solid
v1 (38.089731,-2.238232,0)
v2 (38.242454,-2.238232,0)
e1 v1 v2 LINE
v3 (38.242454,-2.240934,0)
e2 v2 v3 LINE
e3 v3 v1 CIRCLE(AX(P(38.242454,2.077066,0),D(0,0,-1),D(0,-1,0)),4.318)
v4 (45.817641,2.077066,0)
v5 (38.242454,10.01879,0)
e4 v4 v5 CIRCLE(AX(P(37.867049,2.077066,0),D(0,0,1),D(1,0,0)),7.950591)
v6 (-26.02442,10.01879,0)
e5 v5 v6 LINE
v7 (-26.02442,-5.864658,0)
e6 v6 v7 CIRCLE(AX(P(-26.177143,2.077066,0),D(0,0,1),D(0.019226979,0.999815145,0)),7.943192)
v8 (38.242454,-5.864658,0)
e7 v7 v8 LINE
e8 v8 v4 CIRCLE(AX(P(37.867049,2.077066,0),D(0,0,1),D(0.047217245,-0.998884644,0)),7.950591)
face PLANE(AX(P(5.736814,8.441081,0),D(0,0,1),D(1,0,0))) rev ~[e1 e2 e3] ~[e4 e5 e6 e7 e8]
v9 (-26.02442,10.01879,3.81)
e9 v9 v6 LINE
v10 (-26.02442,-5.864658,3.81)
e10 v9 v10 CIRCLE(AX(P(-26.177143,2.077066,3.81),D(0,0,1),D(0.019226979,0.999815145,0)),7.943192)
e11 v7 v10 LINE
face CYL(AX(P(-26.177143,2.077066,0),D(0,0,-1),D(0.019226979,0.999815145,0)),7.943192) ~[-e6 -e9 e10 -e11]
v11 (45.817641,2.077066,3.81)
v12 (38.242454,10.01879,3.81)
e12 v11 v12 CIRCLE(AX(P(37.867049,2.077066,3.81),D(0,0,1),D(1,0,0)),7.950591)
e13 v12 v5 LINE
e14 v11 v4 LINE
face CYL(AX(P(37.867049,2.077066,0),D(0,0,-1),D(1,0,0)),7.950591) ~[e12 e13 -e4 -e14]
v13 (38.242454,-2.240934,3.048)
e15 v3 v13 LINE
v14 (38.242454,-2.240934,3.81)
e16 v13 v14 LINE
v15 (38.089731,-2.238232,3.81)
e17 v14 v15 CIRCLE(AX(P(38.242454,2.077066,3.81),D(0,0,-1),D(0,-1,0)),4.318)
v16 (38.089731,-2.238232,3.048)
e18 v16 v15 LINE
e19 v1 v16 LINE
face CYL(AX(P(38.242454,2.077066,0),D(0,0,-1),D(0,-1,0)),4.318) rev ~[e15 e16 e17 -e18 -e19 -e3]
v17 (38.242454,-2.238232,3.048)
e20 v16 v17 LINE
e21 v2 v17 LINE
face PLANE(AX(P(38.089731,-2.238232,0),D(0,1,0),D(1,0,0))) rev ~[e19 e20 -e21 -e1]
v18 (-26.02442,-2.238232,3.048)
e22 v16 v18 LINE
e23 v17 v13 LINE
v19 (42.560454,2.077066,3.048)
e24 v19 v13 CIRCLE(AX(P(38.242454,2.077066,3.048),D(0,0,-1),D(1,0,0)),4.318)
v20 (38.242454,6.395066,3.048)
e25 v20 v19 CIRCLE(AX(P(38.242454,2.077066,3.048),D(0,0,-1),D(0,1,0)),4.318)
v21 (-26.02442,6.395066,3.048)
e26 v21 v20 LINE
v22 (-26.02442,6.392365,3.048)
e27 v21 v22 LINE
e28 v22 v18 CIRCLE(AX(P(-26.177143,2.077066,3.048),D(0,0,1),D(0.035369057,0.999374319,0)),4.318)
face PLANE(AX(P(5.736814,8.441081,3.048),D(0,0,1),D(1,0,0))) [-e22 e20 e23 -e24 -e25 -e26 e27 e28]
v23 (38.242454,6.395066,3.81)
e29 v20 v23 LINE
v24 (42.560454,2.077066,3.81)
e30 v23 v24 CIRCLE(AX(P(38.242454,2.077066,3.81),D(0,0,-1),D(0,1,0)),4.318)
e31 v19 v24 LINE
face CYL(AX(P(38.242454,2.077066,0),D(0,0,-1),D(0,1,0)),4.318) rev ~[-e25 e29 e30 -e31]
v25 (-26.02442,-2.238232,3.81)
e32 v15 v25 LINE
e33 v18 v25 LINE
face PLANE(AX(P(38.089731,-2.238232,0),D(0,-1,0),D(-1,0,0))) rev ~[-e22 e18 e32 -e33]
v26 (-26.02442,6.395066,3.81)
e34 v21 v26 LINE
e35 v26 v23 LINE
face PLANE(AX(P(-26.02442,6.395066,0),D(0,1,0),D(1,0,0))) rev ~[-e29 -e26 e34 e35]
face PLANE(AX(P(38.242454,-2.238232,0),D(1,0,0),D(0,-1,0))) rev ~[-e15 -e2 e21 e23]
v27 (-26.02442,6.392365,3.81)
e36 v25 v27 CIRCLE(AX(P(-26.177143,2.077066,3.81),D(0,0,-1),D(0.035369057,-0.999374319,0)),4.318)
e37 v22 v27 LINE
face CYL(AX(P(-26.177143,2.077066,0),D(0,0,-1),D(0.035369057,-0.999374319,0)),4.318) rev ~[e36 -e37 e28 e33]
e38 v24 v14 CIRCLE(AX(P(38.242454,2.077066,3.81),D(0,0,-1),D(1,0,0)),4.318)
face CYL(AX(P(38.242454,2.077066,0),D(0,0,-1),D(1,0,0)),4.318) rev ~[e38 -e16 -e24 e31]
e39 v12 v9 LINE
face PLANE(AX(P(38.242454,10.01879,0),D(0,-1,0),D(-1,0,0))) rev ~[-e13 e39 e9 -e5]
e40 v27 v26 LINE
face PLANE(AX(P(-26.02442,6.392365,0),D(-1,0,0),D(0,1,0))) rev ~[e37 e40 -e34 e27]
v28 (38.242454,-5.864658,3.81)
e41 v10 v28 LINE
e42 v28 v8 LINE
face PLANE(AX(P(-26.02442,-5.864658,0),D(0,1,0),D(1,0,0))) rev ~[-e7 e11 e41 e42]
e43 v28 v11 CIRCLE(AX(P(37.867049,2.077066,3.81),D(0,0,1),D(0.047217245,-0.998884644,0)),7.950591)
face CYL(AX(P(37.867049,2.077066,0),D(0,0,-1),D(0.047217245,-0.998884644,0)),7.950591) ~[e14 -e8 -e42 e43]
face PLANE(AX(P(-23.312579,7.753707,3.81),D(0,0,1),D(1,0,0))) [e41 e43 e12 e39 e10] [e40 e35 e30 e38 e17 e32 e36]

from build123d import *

# Parameters (mm, degrees)
F1_DEPTH = 3.81
F2_DEPTH = 3.048


with BuildPart() as f1:
    # F0 (on Top) → F1 (new body)
    with BuildSketch(Plane.XY):
        with BuildLine():
            ThreePointArc((-19.510121746, 6.3950662109), (-22.3157867582, 9.0185520845), (-26.0244197252, 10.0187899587))
            Line((-26.0244197252, 10.0187899587), (-26.0244197252, 6.3950662109))
            Line((-26.0244197252, 6.3950662109), (-19.510121746, 6.3950662109))
        make_face()
        with BuildLine():
            Line((-26.0244197252, 6.3950662109), (-26.0244197252, 10.0187899587))
            ThreePointArc((-26.0244197252, 10.0187899587), (-34.1203354035, 2.0770662109), (-26.0244197252, -5.8646575368))
            Line((-26.0244197252, -5.8646575368), (-26.0244197252, -2.2382320992))
            ThreePointArc((-26.0244197252, -2.2382320992), (-30.4951433134, 2.0770662109), (-26.0244197252, 6.3923645211))
            Line((-26.0244197252, 6.3923645211), (-26.0244197252, 6.3950662109))
        make_face()
        with BuildLine():
            Line((37.4916443036, 10.0187899587), (-26.0244197252, 10.0187899587))
            ThreePointArc((-26.0244197252, 10.0187899587), (-22.3157867582, 9.0185520845), (-19.510121746, 6.3950662109))
            Line((-19.510121746, 6.3950662109), (31.1912137245, 6.3950662109))
            ThreePointArc((31.1912137245, 6.3950662109), (33.9031065879, 8.9690226069), (37.4916443036, 10.0187899587))
        make_face()
        with BuildLine():
            Line((38.2424543545, 10.0187899587), (37.4916443036, 10.0187899587))
            ThreePointArc((37.4916443036, 10.0187899587), (33.9031065879, 8.9690226069), (31.1912137245, 6.3950662109))
            Line((31.1912137245, 6.3950662109), (38.2424543545, 6.3950662109))
            Line((38.2424543545, 6.3950662109), (38.2424543545, 10.0187899587))
        make_face()
        with BuildLine():
            ThreePointArc((-19.5083727315, -2.2382320992), (-22.3143805661, -4.8636372504), (-26.0244197252, -5.8646575368))
            Line((-26.0244197252, -5.8646575368), (37.4916443036, -5.8646575368))
            ThreePointArc((37.4916443036, -5.8646575368), (33.9017122748, -4.8140880512), (31.1894670186, -2.2382320992))
            Line((31.1894670186, -2.2382320992), (-19.5083727315, -2.2382320992))
        make_face()
        with BuildLine():
            Line((-26.0244197252, -2.2382320992), (-26.0244197252, -5.8646575368))
            ThreePointArc((-26.0244197252, -5.8646575368), (-22.3143805661, -4.8636372504), (-19.5083727315, -2.2382320992))
            Line((-19.5083727315, -2.2382320992), (-26.0244197252, -2.2382320992))
        make_face()
        with BuildLine():
            ThreePointArc((45.8176408176, 2.0770662109), (43.6201614007, 7.5646527942), (38.2424543545, 10.0187899587))
            Line((38.2424543545, 10.0187899587), (38.2424543545, 6.3950662109))
            ThreePointArc((38.2424543545, 6.3950662109), (41.2957414356, 5.1303532921), (42.5604543545, 2.0770662109))
            ThreePointArc((42.5604543545, 2.0770662109), (41.2957414356, -0.9762208702), (38.2424543545, -2.2409337891))
            Line((38.2424543545, -2.2409337891), (38.2424543545, -5.8646575368))
            ThreePointArc((38.2424543545, -5.8646575368), (43.6201614007, -3.4105203724), (45.8176408176, 2.0770662109))
        make_face()
        with BuildLine():
            ThreePointArc((31.1894670186, -2.2382320992), (33.9017122748, -4.8140880512), (37.4916443036, -5.8646575368))
            Line((37.4916443036, -5.8646575368), (38.2424543545, -5.8646575368))
            Line((38.2424543545, -5.8646575368), (38.2424543545, -2.2409337891))
            ThreePointArc((38.2424543545, -2.2409337891), (38.1660806131, -2.2402583138), (38.0897307663, -2.2382320992))
            Line((38.0897307663, -2.2382320992), (31.1894670186, -2.2382320992))
        make_face()
    extrude(amount=F1_DEPTH)

    # F0 (on Top) → F2 (join)
    with BuildSketch(Plane.XY):
        with BuildLine():
            Line((37.4916443036, 10.0187899587), (-26.0244197252, 10.0187899587))
            ThreePointArc((-26.0244197252, 10.0187899587), (-22.3157867582, 9.0185520845), (-19.510121746, 6.3950662109))
            Line((-19.510121746, 6.3950662109), (31.1912137245, 6.3950662109))
            ThreePointArc((31.1912137245, 6.3950662109), (33.9031065879, 8.9690226069), (37.4916443036, 10.0187899587))
        make_face()
        with BuildLine():
            Line((31.1912137245, 6.3950662109), (-19.510121746, 6.3950662109))
            ThreePointArc((-19.510121746, 6.3950662109), (-18.5596721596, 4.3283844472), (-18.2339512233, 2.0770662109))
            ThreePointArc((-18.2339512233, 2.0770662109), (-18.5592162228, -0.1727087604), (-19.5083727315, -2.2382320992))
            Line((-19.5083727315, -2.2382320992), (31.1894670186, -2.2382320992))
            ThreePointArc((31.1894670186, -2.2382320992), (29.9164580032, 2.0786747903), (31.1912137245, 6.3950662109))
        make_face()
        with BuildLine():
            Line((38.2424543545, 10.0187899587), (37.4916443036, 10.0187899587))
            ThreePointArc((37.4916443036, 10.0187899587), (33.9031065879, 8.9690226069), (31.1912137245, 6.3950662109))
            Line((31.1912137245, 6.3950662109), (38.2424543545, 6.3950662109))
            Line((38.2424543545, 6.3950662109), (38.2424543545, 10.0187899587))
        make_face()
        with BuildLine():
            Line((38.2424543545, 6.3950662109), (31.1912137245, 6.3950662109))
            ThreePointArc((31.1912137245, 6.3950662109), (29.9164580032, 2.0786747903), (31.1894670186, -2.2382320992))
            Line((31.1894670186, -2.2382320992), (38.0897307663, -2.2382320992))
            ThreePointArc((38.0897307663, -2.2382320992), (33.9251298298, 2.1534399524), (38.2424543545, 6.3950662109))
        make_face()
        with BuildLine():
            Line((38.2424543545, -2.2382320992), (38.2424543545, 6.3950662109))
            ThreePointArc((38.2424543545, 6.3950662109), (33.9251298298, 2.1534399524), (38.0897307663, -2.2382320992))
            Line((38.0897307663, -2.2382320992), (38.2424543545, -2.2382320992))
        make_face()
        with BuildLine():
            ThreePointArc((42.5604543545, 2.0770662109), (41.2957414356, 5.1303532921), (38.2424543545, 6.3950662109))
            Line((38.2424543545, 6.3950662109), (38.2424543545, -2.2382320992))
            Line((38.2424543545, -2.2382320992), (38.2424543545, -2.2409337891))
            ThreePointArc((38.2424543545, -2.2409337891), (41.2957414356, -0.9762208702), (42.5604543545, 2.0770662109))
        make_face()
        with BuildLine():
            ThreePointArc((45.8176408176, 2.0770662109), (43.6201614007, 7.5646527942), (38.2424543545, 10.0187899587))
            Line((38.2424543545, 10.0187899587), (38.2424543545, 6.3950662109))
            ThreePointArc((38.2424543545, 6.3950662109), (41.2957414356, 5.1303532921), (42.5604543545, 2.0770662109))
            ThreePointArc((42.5604543545, 2.0770662109), (41.2957414356, -0.9762208702), (38.2424543545, -2.2409337891))
            Line((38.2424543545, -2.2409337891), (38.2424543545, -5.8646575368))
            ThreePointArc((38.2424543545, -5.8646575368), (43.6201614007, -3.4105203724), (45.8176408176, 2.0770662109))
        make_face()
        with BuildLine():
            ThreePointArc((31.1894670186, -2.2382320992), (33.9017122748, -4.8140880512), (37.4916443036, -5.8646575368))
            Line((37.4916443036, -5.8646575368), (38.2424543545, -5.8646575368))
            Line((38.2424543545, -5.8646575368), (38.2424543545, -2.2409337891))
            ThreePointArc((38.2424543545, -2.2409337891), (38.1660806131, -2.2402583138), (38.0897307663, -2.2382320992))
            Line((38.0897307663, -2.2382320992), (31.1894670186, -2.2382320992))
        make_face()
        with BuildLine():
            ThreePointArc((-19.5083727315, -2.2382320992), (-22.3143805661, -4.8636372504), (-26.0244197252, -5.8646575368))
            Line((-26.0244197252, -5.8646575368), (37.4916443036, -5.8646575368))
            ThreePointArc((37.4916443036, -5.8646575368), (33.9017122748, -4.8140880512), (31.1894670186, -2.2382320992))
            Line((31.1894670186, -2.2382320992), (-19.5083727315, -2.2382320992))
        make_face()
        with BuildLine():
            Line((-19.510121746, 6.3950662109), (-26.0244197252, 6.3950662109))
            Line((-26.0244197252, 6.3950662109), (-26.0244197252, 6.3923645211))
            ThreePointArc((-26.0244197252, 6.3923645211), (-23.0703294749, 5.0758712685), (-21.8591433134, 2.0770662109))
            ThreePointArc((-21.8591433134, 2.0770662109), (-23.0703294749, -0.9217388466), (-26.0244197252, -2.2382320992))
            Line((-26.0244197252, -2.2382320992), (-19.5083727315, -2.2382320992))
            ThreePointArc((-19.5083727315, -2.2382320992), (-18.5592162228, -0.1727087604), (-18.2339512233, 2.0770662109))
            ThreePointArc((-18.2339512233, 2.0770662109), (-18.5596721596, 4.3283844472), (-19.510121746, 6.3950662109))
        make_face()
        with BuildLine():
            Line((-26.0244197252, -2.2382320992), (-26.0244197252, 6.3923645211))
            ThreePointArc((-26.0244197252, 6.3923645211), (-30.4951433134, 2.0770662109), (-26.0244197252, -2.2382320992))
        make_face()
        with BuildLine():
            ThreePointArc((-21.8591433134, 2.0770662109), (-23.0703294749, 5.0758712685), (-26.0244197252, 6.3923645211))
            Line((-26.0244197252, 6.3923645211), (-26.0244197252, -2.2382320992))
            ThreePointArc((-26.0244197252, -2.2382320992), (-23.0703294749, -0.9217388466), (-21.8591433134, 2.0770662109))
        make_face()
        with BuildLine():
            ThreePointArc((-19.510121746, 6.3950662109), (-22.3157867582, 9.0185520845), (-26.0244197252, 10.0187899587))
            Line((-26.0244197252, 10.0187899587), (-26.0244197252, 6.3950662109))
            Line((-26.0244197252, 6.3950662109), (-19.510121746, 6.3950662109))
        make_face()
        with BuildLine():
            Line((-26.0244197252, -2.2382320992), (-26.0244197252, -5.8646575368))
            ThreePointArc((-26.0244197252, -5.8646575368), (-22.3143805661, -4.8636372504), (-19.5083727315, -2.2382320992))
            Line((-19.5083727315, -2.2382320992), (-26.0244197252, -2.2382320992))
        make_face()
    extrude(amount=F2_DEPTH)


solid = f1.part
